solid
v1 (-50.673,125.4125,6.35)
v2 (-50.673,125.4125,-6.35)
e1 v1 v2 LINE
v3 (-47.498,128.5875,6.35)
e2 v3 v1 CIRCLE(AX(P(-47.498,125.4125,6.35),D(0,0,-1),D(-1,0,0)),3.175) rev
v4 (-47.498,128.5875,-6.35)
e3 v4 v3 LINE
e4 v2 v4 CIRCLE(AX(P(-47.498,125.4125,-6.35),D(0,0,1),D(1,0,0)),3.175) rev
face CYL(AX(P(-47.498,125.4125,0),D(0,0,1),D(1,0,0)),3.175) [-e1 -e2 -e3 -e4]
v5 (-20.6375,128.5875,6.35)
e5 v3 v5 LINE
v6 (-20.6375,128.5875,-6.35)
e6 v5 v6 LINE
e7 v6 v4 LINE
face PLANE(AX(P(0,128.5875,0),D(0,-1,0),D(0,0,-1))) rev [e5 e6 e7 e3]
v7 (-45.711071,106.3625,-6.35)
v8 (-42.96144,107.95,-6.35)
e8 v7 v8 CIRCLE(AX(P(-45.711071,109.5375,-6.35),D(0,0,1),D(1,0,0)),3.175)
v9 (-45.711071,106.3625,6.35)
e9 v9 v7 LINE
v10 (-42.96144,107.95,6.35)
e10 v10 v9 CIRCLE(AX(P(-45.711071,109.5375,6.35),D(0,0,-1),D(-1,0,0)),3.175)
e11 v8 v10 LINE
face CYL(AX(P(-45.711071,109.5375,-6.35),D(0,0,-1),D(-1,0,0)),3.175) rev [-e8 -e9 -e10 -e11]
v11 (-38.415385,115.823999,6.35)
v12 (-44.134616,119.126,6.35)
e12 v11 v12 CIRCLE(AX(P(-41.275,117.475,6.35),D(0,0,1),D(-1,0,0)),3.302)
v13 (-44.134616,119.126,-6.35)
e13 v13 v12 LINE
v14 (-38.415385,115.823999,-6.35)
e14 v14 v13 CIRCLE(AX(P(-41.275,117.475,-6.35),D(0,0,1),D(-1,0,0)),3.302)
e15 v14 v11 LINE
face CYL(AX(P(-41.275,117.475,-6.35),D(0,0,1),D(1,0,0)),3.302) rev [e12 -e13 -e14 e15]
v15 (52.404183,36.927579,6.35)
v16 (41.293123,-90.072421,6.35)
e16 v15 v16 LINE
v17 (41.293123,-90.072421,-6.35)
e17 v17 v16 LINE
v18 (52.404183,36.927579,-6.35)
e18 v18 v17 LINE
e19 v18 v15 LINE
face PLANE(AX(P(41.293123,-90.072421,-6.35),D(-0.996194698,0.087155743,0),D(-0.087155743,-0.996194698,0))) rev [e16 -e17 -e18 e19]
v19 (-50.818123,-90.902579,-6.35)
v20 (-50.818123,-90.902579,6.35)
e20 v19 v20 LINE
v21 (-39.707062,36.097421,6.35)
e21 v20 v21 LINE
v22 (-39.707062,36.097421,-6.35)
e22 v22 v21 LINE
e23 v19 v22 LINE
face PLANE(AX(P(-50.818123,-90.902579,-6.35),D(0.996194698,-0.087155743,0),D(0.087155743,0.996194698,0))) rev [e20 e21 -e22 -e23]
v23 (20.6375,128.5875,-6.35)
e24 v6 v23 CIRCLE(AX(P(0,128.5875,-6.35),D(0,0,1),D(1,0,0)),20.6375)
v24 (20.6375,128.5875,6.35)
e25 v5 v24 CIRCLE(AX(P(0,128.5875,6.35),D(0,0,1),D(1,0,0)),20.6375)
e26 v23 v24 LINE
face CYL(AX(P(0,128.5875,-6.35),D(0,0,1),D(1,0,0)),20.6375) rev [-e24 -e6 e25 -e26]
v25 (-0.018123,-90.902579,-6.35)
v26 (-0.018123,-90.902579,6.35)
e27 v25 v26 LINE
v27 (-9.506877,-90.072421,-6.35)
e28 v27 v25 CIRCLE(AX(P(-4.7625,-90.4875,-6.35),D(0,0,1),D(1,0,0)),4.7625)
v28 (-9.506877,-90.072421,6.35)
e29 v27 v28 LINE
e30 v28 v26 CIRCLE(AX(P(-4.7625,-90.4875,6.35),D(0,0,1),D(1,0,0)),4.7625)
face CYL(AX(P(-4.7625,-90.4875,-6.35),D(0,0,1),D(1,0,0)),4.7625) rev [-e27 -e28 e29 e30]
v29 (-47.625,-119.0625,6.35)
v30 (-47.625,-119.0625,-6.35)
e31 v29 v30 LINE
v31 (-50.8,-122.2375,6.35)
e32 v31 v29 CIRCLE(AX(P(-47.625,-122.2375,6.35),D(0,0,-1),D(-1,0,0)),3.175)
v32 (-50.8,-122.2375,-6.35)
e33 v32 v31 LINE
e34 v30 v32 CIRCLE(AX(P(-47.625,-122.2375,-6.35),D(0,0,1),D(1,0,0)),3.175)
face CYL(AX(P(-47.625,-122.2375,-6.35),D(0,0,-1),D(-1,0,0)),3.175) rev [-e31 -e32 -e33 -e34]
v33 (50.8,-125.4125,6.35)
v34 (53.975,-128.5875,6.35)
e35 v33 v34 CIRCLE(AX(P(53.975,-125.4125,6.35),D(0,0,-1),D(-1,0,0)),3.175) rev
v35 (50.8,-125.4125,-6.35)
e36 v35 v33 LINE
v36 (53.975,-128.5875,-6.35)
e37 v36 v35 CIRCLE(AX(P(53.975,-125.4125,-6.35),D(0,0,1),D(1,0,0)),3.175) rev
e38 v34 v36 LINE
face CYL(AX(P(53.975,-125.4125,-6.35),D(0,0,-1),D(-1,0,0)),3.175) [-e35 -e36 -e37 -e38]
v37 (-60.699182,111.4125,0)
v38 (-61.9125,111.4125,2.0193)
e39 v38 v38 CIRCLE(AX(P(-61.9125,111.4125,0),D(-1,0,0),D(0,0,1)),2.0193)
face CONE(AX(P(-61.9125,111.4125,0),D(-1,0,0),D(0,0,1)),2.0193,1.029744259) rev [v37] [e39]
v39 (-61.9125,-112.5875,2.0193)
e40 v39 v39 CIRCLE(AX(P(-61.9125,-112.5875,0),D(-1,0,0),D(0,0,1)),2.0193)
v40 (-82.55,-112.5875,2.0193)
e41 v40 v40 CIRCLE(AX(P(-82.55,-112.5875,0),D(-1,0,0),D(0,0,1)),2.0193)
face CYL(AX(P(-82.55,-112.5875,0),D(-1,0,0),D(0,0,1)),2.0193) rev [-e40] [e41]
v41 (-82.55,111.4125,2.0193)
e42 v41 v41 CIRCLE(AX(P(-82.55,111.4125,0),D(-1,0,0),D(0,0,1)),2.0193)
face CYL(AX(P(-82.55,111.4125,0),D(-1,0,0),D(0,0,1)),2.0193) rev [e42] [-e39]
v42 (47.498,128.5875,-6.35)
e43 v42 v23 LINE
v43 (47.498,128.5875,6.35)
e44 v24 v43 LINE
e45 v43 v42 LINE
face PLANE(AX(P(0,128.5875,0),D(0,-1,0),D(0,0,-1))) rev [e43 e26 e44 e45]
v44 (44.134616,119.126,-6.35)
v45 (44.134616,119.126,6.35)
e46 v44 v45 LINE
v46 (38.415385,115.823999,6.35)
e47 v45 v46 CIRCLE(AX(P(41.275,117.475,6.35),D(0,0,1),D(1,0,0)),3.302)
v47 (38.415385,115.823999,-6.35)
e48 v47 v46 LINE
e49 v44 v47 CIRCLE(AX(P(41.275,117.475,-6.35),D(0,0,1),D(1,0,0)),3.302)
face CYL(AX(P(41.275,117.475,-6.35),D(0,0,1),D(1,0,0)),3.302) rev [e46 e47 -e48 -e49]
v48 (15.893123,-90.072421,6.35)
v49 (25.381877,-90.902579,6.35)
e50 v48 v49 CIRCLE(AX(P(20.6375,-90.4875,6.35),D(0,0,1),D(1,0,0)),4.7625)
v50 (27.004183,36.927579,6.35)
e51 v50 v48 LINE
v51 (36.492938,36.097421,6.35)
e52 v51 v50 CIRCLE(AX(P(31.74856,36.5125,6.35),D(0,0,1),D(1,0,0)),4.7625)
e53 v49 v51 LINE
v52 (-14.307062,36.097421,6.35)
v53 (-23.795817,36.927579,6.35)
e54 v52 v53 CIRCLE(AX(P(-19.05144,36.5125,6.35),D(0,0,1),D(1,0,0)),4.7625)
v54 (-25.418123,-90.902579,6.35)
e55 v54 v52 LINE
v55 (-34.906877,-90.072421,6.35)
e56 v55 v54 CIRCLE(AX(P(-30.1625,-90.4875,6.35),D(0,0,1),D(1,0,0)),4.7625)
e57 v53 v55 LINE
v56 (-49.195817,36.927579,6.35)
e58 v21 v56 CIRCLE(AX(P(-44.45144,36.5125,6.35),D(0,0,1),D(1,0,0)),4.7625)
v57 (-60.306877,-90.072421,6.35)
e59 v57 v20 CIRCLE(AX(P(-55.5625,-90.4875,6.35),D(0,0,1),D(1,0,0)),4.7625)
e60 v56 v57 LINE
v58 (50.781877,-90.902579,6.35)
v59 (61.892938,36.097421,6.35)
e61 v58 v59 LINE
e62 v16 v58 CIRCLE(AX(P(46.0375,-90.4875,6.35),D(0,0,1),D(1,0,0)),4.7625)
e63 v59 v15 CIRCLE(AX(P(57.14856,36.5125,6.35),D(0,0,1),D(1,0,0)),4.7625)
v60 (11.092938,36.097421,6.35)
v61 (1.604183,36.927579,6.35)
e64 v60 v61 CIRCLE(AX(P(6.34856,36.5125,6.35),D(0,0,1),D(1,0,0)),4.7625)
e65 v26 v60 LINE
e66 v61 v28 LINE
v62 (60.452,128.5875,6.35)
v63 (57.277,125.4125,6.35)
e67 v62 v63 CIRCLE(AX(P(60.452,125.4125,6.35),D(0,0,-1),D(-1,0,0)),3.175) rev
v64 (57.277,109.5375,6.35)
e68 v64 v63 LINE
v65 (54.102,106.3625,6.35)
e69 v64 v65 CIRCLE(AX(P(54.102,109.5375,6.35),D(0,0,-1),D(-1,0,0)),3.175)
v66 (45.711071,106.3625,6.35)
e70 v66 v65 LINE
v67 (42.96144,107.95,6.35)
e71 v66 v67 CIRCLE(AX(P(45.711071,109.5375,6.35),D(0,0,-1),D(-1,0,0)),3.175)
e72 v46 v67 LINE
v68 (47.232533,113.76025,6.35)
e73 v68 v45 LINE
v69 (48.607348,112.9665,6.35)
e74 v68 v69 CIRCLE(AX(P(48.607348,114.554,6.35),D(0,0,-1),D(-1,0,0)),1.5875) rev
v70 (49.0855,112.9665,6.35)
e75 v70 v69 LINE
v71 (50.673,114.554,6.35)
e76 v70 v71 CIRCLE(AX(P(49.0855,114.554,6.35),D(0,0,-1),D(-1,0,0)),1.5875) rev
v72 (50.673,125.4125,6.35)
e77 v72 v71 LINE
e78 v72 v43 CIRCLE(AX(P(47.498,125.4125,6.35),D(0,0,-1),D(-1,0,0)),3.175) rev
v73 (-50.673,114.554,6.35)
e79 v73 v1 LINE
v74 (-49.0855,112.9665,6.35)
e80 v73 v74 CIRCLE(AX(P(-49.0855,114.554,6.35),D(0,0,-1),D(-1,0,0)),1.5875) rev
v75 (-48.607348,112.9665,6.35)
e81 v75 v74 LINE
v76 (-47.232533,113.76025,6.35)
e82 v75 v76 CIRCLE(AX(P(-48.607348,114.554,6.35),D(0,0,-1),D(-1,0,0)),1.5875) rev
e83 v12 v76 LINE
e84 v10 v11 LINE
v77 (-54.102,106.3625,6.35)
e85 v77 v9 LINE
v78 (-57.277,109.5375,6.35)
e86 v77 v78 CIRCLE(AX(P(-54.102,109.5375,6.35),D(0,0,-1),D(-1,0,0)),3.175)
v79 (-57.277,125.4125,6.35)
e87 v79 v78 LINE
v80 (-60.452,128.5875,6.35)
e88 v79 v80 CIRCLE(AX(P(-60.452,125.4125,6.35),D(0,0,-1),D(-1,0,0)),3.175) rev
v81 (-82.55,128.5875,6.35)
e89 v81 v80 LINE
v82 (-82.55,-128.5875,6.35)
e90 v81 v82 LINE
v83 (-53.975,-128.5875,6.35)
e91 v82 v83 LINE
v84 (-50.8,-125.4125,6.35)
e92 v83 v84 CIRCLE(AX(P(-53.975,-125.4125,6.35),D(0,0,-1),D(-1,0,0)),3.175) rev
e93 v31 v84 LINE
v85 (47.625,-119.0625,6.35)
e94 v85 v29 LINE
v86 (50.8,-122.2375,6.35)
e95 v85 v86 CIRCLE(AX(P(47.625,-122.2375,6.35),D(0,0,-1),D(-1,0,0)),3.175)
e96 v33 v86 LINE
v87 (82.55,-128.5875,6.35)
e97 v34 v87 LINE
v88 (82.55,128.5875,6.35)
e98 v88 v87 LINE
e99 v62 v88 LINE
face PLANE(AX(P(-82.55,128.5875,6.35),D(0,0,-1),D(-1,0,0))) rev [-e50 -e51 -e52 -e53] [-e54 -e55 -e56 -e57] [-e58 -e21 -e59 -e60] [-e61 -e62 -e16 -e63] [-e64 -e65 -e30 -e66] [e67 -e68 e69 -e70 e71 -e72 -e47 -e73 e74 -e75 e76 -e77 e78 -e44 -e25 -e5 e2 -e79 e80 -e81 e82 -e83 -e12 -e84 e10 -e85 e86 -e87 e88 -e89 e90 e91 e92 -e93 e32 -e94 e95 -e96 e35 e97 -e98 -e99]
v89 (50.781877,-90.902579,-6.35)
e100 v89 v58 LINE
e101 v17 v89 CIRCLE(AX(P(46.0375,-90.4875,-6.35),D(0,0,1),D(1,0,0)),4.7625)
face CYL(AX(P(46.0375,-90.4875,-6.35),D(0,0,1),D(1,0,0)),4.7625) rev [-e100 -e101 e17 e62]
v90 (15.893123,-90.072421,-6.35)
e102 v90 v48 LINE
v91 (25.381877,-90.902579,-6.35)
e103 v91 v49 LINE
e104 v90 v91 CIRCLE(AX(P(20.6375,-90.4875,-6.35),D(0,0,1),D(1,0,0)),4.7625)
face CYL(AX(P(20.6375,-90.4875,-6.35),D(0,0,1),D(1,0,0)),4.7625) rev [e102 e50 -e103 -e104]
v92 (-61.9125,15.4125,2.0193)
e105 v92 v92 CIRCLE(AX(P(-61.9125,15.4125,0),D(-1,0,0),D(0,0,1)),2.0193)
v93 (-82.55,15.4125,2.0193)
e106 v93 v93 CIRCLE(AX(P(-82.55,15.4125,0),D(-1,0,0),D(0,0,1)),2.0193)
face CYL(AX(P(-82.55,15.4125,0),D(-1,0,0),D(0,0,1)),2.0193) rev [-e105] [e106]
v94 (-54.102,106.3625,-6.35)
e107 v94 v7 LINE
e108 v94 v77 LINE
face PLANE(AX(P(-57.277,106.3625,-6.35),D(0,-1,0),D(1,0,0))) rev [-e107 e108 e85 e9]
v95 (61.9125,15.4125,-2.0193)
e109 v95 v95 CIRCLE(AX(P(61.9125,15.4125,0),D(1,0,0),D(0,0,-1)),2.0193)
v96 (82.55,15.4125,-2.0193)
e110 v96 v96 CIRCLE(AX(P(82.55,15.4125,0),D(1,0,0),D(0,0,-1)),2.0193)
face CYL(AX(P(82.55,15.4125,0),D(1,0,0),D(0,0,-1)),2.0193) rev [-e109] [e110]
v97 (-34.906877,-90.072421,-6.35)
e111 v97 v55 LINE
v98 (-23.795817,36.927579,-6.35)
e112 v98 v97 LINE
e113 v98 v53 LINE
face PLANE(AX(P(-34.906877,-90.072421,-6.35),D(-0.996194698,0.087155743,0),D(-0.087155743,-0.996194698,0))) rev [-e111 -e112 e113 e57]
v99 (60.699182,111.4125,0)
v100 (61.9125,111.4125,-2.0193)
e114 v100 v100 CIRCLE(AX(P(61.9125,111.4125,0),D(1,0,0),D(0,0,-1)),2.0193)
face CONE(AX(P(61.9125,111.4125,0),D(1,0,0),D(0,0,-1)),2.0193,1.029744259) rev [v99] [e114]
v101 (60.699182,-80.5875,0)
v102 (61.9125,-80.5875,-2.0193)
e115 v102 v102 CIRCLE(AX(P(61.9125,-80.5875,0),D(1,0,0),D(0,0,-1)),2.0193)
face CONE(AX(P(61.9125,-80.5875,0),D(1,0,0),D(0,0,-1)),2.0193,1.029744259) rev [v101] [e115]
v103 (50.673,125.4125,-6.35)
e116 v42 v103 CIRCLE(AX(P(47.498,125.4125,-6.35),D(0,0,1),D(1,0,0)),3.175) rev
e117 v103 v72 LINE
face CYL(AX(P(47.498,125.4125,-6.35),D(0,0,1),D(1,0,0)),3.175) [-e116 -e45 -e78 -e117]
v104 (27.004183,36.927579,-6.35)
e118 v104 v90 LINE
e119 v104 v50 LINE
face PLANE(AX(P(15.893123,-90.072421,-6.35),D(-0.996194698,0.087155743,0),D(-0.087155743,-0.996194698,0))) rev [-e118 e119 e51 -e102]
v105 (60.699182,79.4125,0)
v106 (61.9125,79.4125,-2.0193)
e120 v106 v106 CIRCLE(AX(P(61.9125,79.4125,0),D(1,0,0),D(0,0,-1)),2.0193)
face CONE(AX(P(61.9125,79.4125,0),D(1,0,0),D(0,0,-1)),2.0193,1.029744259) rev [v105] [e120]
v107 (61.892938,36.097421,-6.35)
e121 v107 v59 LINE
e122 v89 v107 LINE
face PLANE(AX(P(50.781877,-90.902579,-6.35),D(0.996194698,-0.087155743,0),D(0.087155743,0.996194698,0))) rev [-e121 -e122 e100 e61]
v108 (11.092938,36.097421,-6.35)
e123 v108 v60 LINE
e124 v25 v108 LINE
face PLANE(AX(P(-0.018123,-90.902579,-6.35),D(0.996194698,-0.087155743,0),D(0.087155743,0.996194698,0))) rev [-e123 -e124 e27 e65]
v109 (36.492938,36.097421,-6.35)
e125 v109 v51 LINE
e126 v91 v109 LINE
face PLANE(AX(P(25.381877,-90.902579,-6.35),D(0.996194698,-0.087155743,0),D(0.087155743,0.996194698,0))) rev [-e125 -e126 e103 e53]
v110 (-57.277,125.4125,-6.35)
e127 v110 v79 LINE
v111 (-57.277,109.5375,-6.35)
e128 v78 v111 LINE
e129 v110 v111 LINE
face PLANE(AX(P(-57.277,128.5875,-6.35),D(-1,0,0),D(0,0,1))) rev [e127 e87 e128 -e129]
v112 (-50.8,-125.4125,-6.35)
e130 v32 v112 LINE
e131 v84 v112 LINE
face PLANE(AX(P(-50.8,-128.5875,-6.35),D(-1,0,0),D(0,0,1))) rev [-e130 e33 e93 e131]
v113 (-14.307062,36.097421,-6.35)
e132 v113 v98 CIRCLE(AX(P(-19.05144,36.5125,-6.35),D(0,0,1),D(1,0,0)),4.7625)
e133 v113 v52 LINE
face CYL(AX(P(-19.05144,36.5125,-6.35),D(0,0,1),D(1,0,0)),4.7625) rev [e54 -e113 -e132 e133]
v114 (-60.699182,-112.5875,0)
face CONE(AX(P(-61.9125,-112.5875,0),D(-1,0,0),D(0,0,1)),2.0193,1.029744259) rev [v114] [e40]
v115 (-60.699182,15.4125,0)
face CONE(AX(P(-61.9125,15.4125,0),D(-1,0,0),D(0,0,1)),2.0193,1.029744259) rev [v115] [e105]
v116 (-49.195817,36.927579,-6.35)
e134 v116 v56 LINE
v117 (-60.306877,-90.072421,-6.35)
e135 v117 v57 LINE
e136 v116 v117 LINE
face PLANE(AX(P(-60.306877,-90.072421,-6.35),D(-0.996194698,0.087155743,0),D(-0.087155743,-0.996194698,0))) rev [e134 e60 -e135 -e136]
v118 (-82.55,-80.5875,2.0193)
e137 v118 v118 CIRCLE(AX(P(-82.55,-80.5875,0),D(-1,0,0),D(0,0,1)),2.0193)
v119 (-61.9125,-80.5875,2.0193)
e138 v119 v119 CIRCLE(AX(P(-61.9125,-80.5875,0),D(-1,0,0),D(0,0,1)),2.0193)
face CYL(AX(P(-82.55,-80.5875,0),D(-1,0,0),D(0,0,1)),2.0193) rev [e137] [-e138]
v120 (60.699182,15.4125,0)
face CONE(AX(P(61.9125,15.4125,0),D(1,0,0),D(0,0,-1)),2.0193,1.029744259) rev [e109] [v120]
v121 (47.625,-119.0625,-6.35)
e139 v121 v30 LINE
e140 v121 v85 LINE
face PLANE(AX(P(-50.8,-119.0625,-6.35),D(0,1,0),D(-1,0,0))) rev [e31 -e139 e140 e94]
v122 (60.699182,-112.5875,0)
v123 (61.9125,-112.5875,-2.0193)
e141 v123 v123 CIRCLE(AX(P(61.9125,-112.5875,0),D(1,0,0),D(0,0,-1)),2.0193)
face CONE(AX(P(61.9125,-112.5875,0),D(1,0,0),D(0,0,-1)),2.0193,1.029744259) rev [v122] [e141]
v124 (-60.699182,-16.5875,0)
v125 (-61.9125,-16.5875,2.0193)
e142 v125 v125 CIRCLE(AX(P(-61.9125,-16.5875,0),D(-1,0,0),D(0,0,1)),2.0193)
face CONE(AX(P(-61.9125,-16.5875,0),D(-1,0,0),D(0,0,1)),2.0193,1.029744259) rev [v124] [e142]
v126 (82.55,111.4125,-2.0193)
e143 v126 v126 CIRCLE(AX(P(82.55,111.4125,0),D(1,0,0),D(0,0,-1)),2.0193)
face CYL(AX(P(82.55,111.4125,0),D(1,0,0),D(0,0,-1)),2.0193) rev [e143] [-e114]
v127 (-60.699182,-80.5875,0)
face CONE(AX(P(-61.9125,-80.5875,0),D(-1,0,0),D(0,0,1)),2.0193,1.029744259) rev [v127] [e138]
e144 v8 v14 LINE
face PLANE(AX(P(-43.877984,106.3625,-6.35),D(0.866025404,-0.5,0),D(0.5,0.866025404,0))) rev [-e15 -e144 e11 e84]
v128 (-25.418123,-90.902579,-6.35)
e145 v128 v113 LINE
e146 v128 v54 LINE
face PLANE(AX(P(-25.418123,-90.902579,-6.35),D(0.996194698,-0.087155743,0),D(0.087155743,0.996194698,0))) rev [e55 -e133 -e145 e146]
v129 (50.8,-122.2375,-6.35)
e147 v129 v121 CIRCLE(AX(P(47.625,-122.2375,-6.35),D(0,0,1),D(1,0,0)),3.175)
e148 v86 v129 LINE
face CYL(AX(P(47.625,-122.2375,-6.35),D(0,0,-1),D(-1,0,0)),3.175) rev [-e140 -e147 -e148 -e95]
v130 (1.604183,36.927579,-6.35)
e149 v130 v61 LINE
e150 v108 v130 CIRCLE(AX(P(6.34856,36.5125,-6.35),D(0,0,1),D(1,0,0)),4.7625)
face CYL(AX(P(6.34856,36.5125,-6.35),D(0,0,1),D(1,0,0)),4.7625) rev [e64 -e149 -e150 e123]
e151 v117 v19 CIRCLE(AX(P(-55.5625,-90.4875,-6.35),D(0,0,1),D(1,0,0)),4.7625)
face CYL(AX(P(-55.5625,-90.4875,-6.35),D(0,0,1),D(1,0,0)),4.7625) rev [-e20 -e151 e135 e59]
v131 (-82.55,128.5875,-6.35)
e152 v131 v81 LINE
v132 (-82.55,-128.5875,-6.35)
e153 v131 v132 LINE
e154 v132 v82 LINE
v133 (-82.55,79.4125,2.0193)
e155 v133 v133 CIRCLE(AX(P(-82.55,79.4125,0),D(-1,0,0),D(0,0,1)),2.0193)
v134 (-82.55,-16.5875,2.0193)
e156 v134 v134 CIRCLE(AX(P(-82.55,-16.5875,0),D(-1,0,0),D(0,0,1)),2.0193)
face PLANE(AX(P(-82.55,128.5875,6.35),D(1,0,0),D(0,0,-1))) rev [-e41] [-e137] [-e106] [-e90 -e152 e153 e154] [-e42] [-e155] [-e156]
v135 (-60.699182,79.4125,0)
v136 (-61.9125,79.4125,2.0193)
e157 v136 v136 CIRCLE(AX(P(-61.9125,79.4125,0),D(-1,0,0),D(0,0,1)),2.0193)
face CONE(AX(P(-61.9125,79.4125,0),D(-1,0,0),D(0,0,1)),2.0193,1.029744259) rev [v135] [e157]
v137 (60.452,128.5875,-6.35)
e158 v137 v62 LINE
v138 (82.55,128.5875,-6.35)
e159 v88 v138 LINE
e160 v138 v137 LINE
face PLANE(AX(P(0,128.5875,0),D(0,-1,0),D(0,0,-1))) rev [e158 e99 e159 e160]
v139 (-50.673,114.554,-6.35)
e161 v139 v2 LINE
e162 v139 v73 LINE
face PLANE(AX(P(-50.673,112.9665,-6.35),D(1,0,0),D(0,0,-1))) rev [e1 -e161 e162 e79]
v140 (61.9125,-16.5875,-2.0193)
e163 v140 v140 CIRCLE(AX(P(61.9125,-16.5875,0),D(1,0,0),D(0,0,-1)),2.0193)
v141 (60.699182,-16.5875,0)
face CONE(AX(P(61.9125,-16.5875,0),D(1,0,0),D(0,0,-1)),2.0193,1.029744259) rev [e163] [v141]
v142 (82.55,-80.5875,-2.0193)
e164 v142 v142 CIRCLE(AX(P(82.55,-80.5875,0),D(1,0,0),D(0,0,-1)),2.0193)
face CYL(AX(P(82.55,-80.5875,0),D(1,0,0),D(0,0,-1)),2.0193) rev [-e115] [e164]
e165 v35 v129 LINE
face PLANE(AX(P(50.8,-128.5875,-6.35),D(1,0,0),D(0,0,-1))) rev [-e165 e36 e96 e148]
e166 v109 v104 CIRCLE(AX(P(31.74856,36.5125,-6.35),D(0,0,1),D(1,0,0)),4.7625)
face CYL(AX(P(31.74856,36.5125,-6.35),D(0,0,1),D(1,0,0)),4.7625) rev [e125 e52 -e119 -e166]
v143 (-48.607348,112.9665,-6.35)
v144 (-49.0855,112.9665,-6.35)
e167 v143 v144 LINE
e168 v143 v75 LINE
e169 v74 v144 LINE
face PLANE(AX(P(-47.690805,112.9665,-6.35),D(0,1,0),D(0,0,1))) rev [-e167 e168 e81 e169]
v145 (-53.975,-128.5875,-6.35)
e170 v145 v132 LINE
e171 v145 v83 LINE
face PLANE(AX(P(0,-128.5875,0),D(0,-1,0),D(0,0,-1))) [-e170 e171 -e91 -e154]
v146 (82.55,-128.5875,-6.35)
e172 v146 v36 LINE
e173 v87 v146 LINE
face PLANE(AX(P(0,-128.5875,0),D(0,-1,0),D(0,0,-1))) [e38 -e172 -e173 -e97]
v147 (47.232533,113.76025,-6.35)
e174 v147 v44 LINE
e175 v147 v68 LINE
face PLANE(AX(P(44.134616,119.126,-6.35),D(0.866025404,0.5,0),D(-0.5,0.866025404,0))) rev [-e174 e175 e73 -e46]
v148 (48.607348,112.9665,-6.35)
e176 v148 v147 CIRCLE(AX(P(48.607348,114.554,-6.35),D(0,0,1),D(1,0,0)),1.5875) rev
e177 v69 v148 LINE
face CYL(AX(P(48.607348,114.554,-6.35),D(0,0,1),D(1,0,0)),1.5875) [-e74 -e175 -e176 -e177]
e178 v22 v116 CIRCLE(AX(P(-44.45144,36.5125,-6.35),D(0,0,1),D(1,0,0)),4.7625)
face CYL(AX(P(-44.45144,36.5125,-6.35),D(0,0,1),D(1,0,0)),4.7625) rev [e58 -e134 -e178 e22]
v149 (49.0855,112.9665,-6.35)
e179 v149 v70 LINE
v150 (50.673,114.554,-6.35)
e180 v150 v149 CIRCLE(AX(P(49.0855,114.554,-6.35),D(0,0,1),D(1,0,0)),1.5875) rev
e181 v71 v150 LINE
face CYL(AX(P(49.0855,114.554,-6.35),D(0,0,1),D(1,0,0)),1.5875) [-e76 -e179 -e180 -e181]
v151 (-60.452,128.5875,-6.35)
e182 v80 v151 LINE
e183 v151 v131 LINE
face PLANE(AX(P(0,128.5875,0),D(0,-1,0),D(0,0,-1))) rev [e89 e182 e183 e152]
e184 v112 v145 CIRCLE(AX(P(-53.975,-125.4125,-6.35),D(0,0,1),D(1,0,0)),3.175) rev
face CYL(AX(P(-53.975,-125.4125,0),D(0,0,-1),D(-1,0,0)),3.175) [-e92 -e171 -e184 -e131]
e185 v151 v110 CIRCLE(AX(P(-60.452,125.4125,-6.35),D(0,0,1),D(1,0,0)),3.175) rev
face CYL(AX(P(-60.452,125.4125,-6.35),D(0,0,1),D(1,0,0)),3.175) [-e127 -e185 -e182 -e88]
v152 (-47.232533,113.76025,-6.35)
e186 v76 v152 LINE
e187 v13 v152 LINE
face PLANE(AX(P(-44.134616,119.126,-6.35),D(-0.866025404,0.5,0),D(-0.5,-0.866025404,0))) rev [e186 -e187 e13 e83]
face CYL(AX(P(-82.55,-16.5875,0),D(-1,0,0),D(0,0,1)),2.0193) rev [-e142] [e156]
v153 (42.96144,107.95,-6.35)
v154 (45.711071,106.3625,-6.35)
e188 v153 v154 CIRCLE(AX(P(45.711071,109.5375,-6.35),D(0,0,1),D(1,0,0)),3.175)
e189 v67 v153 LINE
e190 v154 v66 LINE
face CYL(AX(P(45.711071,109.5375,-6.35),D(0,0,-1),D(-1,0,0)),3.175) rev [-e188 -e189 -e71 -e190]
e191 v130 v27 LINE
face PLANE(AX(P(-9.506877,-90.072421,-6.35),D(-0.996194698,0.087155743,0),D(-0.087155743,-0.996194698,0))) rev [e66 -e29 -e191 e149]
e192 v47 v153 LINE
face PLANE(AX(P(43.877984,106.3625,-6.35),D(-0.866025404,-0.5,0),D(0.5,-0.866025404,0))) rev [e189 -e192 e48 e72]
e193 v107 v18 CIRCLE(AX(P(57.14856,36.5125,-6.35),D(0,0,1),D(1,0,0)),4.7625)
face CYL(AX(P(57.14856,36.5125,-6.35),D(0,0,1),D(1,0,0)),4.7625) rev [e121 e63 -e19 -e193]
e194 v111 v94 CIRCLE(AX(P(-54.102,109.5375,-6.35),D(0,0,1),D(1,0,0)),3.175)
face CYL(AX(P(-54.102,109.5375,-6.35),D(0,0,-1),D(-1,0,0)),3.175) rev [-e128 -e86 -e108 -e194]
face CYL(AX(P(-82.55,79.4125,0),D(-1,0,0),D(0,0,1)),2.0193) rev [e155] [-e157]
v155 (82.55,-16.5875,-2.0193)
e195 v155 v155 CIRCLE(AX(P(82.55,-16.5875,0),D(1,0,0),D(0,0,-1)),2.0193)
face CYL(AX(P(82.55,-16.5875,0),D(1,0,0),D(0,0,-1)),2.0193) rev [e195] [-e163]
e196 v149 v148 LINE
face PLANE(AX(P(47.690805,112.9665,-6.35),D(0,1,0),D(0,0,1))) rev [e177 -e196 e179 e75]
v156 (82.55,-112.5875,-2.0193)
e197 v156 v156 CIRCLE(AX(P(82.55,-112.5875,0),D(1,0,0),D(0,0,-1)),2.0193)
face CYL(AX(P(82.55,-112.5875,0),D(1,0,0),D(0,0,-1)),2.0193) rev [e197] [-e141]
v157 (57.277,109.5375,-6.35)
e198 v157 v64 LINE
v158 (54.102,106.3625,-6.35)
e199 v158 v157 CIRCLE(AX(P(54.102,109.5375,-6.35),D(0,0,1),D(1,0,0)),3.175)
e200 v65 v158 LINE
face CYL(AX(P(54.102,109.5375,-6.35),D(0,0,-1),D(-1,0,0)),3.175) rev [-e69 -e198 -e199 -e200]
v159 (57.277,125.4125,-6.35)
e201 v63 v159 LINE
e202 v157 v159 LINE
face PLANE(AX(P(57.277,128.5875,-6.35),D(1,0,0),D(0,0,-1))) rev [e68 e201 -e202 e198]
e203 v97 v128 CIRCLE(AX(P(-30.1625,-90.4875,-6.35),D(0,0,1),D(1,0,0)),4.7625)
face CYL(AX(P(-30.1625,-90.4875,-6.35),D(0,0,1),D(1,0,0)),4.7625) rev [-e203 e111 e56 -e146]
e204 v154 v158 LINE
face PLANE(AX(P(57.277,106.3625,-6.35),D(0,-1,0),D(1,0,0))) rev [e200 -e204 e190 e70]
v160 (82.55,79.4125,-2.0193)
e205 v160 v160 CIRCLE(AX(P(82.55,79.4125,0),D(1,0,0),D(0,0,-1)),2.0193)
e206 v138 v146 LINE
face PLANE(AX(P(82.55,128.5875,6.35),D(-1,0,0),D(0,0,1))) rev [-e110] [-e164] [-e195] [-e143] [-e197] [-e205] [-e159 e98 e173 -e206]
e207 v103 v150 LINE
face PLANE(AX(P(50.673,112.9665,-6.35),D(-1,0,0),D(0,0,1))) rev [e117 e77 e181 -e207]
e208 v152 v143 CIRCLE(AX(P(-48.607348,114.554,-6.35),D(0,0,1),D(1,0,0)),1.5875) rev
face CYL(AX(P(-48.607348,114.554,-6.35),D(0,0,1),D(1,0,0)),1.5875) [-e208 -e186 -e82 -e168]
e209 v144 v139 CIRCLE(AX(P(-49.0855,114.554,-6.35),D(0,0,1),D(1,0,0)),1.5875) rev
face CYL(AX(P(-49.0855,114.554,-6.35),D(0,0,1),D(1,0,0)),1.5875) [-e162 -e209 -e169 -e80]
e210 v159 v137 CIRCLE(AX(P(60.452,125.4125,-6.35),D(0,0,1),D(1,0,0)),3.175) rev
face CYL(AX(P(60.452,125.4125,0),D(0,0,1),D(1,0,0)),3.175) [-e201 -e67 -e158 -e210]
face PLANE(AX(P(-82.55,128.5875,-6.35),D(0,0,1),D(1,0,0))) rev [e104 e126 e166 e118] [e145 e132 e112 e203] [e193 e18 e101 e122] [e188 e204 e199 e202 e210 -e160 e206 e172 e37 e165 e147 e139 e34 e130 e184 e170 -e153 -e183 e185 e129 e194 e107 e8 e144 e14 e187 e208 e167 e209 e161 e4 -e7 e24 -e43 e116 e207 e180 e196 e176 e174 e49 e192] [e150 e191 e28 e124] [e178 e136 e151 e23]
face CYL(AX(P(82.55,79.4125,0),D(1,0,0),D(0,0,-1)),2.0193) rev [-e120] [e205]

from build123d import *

# Parameters (mm, degrees)
SKETCH1_W                       = 165.1
SKETCH1_H                       = 12.7
BOSS_EXTRUDE1_DEPTH             = 128.5875
SKETCH2_R                       = 20.6375
CUT_EXTRUDE1_DEPTH              = 154.33146336
CUT_EXTRUDE3_DEPTH              = 154.33146336
FILLET1_R                       = 3.175
FILLET2_R                       = 1.5875
SKETCH5_W                       = 101.6
SKETCH5_H                       = 9.525
CUT_EXTRUDE4_DEPTH              = 154.33146336
FILLET3_R                       = 3.175
F_21_0_159_DIAMETER_HOLE2_D     = 4.0386
F_21_0_159_DIAMETER_HOLE2_DEPTH = 20.6375
F_21_0_159_DIAMETER_HOLE2_TIP   = 1.213317848
CUT_EXTRUDE5_DEPTH              = 154.33146336


# Read off the part's stored shape, not the designer's step: #21 (0.159) Diameter Hole1
with BuildPart() as part:
    # Sketch1 → Boss-Extrude1 (new, symmetric)
    with BuildSketch(Plane(origin=(0, 0, 0), x_dir=(1, 0, 0), z_dir=(0, 1, 0))):
        Rectangle(SKETCH1_W, SKETCH1_H)
    extrude(amount=BOSS_EXTRUDE1_DEPTH, both=True)

    # Sketch2 → Cut-Extrude1 (cut, through all)
    with BuildSketch(Plane.XY.offset(6.35)):
        with Locations((0, 128.5875)):
            Circle(SKETCH2_R)
    extrude(amount=-CUT_EXTRUDE1_DEPTH, mode=Mode.SUBTRACT)

    # Sketch4 → Cut-Extrude3 (cut, through all)
    with BuildSketch(Plane.XY.offset(6.35)):
        with BuildLine():
            Line((57.277, 128.5875), (57.277, 106.3625))
            Line((57.277, 106.3625), (43.877983689, 106.3625))
            Line((43.877983689, 106.3625), (38.415384653, 115.823999072))
            ThreePointArc((38.415384653, 115.823999072), (39.623999536, 120.334615615), (44.134615883, 119.126))
            Line((44.134615883, 119.126), (47.690804866, 112.9665))
            Line((47.690804866, 112.9665), (50.673, 112.9665))
            Line((50.673, 112.9665), (50.673, 128.5875))
            Line((50.673, 128.5875), (57.277, 128.5875))
        make_face()
        with BuildLine():
            Line((-50.673, 128.5875), (-57.277, 128.5875))
            Line((-57.277, 128.5875), (-57.277, 106.3625))
            Line((-57.277, 106.3625), (-43.877983689, 106.3625))
            Line((-43.877983689, 106.3625), (-38.415384653, 115.823999072))
            ThreePointArc((-38.415384653, 115.823999072), (-39.623999536, 120.334615615), (-44.134615883, 119.126))
            Line((-44.134615883, 119.126), (-47.690804866, 112.9665))
            Line((-47.690804866, 112.9665), (-50.673, 112.9665))
            Line((-50.673, 112.9665), (-50.673, 128.5875))
        make_face()
    extrude(amount=-CUT_EXTRUDE3_DEPTH, mode=Mode.SUBTRACT)

    # Fillet1
    fillet1_edges = [part.edges().sort_by_distance(p)[0] for p in [
        (50.673, 128.5875, 0),
        (57.277, 128.5875, 0),
        (57.277, 106.3625, 0),
        (43.877983689, 106.3625, 0),
        (-43.877983689, 106.3625, 0),
        (-57.277, 106.3625, 0),
        (-57.277, 128.5875, 0),
        (-50.673, 128.5875, 0),
    ]]
    fillet(fillet1_edges, radius=FILLET1_R)

    # Fillet2
    fillet2_edges = [part.edges().sort_by_distance(p)[0] for p in [
        (47.690804866, 112.9665, 0),
        (50.673, 112.9665, 0),
        (-50.673, 112.9665, 0),
        (-47.690804866, 112.9665, 0),
    ]]
    fillet(fillet2_edges, radius=FILLET2_R)

    # Sketch5 → Cut-Extrude4 (cut, through all)
    with BuildSketch(Plane.XY.offset(6.35)):
        with Locations((0, -123.825)):
            Rectangle(SKETCH5_W, SKETCH5_H)
    extrude(amount=-CUT_EXTRUDE4_DEPTH, mode=Mode.SUBTRACT)

    # Fillet3
    fillet3_edges = [part.edges().sort_by_distance(p)[0] for p in [
        (-50.8, -128.5875, 0),
        (-50.8, -119.0625, 0),
        (50.8, -119.0625, 0),
        (50.8, -128.5875, 0),
    ]]
    fillet(fillet3_edges, radius=FILLET3_R)

    # #21 (0.159) Diameter Hole1 outline → #21 (0.159) Diameter Hole1 (revolve, cut)
    with BuildSketch(Plane(origin=(0, 111.412500004, 0), x_dir=(0, 1, 0), z_dir=(0, 0, -1))):
        Polygon((0, 82.55), (0, 60.699182152), (2.0193, 61.9125), (2.0193, 82.55), align=None)
    revolve(axis=Axis((0, 111.412500004, 0), (1, 0, 0)), mode=Mode.SUBTRACT)

    # 21 _0.159_ Diameter Hole1 2 outline → 21 _0.159_ Diameter Hole1 2 (revolve, cut)
    with BuildSketch(Plane(origin=(0, 79.412500004, 0), x_dir=(0, 1, 0), z_dir=(0, 0, -1))):
        Polygon((0, 82.55), (0, 60.699182152), (2.0193, 61.9125), (2.0193, 82.55), align=None)
    revolve(axis=Axis((0, 79.412500004, 0), (1, 0, 0)), mode=Mode.SUBTRACT)

    # 21 _0.159_ Diameter Hole1 3 outline → 21 _0.159_ Diameter Hole1 3 (revolve, cut)
    with BuildSketch(Plane(origin=(0, 15.412500004, 0), x_dir=(0, 1, 0), z_dir=(0, 0, -1))):
        Polygon((0, 82.55), (0, 60.699182152), (2.0193, 61.9125), (2.0193, 82.55), align=None)
    revolve(axis=Axis((0, 15.412500004, 0), (1, 0, 0)), mode=Mode.SUBTRACT)

    # 21 _0.159_ Diameter Hole1 4 outline → 21 _0.159_ Diameter Hole1 4 (revolve, cut)
    with BuildSketch(Plane(origin=(0, -16.587499996, 0), x_dir=(0, 1, 0), z_dir=(0, 0, -1))):
        Polygon((0, 82.55), (0, 60.699182152), (2.0193, 61.9125), (2.0193, 82.55), align=None)
    revolve(axis=Axis((0, -16.587499996, 0), (1, 0, 0)), mode=Mode.SUBTRACT)

    # 21 _0.159_ Diameter Hole1 5 outline → 21 _0.159_ Diameter Hole1 5 (revolve, cut)
    with BuildSketch(Plane(origin=(0, -80.587499996, 0), x_dir=(0, 1, 0), z_dir=(0, 0, -1))):
        Polygon((0, 82.55), (0, 60.699182152), (2.0193, 61.9125), (2.0193, 82.55), align=None)
    revolve(axis=Axis((0, -80.587499996, 0), (1, 0, 0)), mode=Mode.SUBTRACT)

    # 21 _0.159_ Diameter Hole1 6 outline → 21 _0.159_ Diameter Hole1 6 (revolve, cut)
    with BuildSketch(Plane(origin=(0, -112.587499996, 0), x_dir=(0, 1, 0), z_dir=(0, 0, -1))):
        Polygon((0, 82.55), (0, 60.699182152), (2.0193, 61.9125), (2.0193, 82.55), align=None)
    revolve(axis=Axis((0, -112.587499996, 0), (1, 0, 0)), mode=Mode.SUBTRACT)

    # #21 (0.159) Diameter Hole2
    with Locations(Plane.ZY.offset(82.55)):
        with Locations((0, -112.587499996), (0, -80.587499996), (0, -16.587499996), (0, 15.412500004), (0, 79.412500004), (0, 111.412500004)):
            Hole(F_21_0_159_DIAMETER_HOLE2_D / 2, depth=F_21_0_159_DIAMETER_HOLE2_DEPTH)
            with Locations((0, 0, -(F_21_0_159_DIAMETER_HOLE2_DEPTH + F_21_0_159_DIAMETER_HOLE2_TIP / 2))):  # 118° drill point
                Cone(0, F_21_0_159_DIAMETER_HOLE2_D / 2, F_21_0_159_DIAMETER_HOLE2_TIP, mode=Mode.SUBTRACT)

    # Sketch10 → Cut-Extrude5 (cut, through all)
    with BuildSketch(Plane.XY.offset(6.35)):
        with BuildLine():
            Line((-60.30687725, -90.072420775), (-49.195816982, 36.927579225))
            ThreePointArc((-49.195816982, 36.927579225), (-44.036360507, 41.25687725), (-39.707062483, 36.097420775))
            Line((-39.707062483, 36.097420775), (-50.81812275, -90.902579225))
            ThreePointArc((-50.81812275, -90.902579225), (-55.977579225, -95.23187725), (-60.30687725, -90.072420775))
        make_face()
        with BuildLine():
            Line((-25.41812275, -90.902579225), (-14.307062483, 36.097420775))
            ThreePointArc((-14.307062483, 36.097420775), (-18.636360507, 41.25687725), (-23.795816982, 36.927579225))
            Line((-23.795816982, 36.927579225), (-34.90687725, -90.072420775))
            ThreePointArc((-34.90687725, -90.072420775), (-30.577579225, -95.23187725), (-25.41812275, -90.902579225))
        make_face()
        with BuildLine():
            Line((-0.01812275, -90.902579225), (11.092937517, 36.097420775))
            ThreePointArc((11.092937517, 36.097420775), (6.763639493, 41.25687725), (1.604183018, 36.927579225))
            Line((1.604183018, 36.927579225), (-9.50687725, -90.072420775))
            ThreePointArc((-9.50687725, -90.072420775), (-5.177579225, -95.23187725), (-0.01812275, -90.902579225))
        make_face()
        with BuildLine():
            Line((25.38187725, -90.902579225), (36.492937517, 36.097420775))
            ThreePointArc((36.492937517, 36.097420775), (32.163639493, 41.25687725), (27.004183018, 36.927579225))
            Line((27.004183018, 36.927579225), (15.89312275, -90.072420775))
            ThreePointArc((15.89312275, -90.072420775), (20.222420775, -95.23187725), (25.38187725, -90.902579225))
        make_face()
        with BuildLine():
            Line((50.78187725, -90.902579225), (61.892937517, 36.097420775))
            ThreePointArc((61.892937517, 36.097420775), (57.563639493, 41.25687725), (52.404183018, 36.927579225))
            Line((52.404183018, 36.927579225), (41.29312275, -90.072420775))
            ThreePointArc((41.29312275, -90.072420775), (45.622420775, -95.23187725), (50.78187725, -90.902579225))
        make_face()
    extrude(amount=-CUT_EXTRUDE5_DEPTH, mode=Mode.SUBTRACT)


solid = part.part
